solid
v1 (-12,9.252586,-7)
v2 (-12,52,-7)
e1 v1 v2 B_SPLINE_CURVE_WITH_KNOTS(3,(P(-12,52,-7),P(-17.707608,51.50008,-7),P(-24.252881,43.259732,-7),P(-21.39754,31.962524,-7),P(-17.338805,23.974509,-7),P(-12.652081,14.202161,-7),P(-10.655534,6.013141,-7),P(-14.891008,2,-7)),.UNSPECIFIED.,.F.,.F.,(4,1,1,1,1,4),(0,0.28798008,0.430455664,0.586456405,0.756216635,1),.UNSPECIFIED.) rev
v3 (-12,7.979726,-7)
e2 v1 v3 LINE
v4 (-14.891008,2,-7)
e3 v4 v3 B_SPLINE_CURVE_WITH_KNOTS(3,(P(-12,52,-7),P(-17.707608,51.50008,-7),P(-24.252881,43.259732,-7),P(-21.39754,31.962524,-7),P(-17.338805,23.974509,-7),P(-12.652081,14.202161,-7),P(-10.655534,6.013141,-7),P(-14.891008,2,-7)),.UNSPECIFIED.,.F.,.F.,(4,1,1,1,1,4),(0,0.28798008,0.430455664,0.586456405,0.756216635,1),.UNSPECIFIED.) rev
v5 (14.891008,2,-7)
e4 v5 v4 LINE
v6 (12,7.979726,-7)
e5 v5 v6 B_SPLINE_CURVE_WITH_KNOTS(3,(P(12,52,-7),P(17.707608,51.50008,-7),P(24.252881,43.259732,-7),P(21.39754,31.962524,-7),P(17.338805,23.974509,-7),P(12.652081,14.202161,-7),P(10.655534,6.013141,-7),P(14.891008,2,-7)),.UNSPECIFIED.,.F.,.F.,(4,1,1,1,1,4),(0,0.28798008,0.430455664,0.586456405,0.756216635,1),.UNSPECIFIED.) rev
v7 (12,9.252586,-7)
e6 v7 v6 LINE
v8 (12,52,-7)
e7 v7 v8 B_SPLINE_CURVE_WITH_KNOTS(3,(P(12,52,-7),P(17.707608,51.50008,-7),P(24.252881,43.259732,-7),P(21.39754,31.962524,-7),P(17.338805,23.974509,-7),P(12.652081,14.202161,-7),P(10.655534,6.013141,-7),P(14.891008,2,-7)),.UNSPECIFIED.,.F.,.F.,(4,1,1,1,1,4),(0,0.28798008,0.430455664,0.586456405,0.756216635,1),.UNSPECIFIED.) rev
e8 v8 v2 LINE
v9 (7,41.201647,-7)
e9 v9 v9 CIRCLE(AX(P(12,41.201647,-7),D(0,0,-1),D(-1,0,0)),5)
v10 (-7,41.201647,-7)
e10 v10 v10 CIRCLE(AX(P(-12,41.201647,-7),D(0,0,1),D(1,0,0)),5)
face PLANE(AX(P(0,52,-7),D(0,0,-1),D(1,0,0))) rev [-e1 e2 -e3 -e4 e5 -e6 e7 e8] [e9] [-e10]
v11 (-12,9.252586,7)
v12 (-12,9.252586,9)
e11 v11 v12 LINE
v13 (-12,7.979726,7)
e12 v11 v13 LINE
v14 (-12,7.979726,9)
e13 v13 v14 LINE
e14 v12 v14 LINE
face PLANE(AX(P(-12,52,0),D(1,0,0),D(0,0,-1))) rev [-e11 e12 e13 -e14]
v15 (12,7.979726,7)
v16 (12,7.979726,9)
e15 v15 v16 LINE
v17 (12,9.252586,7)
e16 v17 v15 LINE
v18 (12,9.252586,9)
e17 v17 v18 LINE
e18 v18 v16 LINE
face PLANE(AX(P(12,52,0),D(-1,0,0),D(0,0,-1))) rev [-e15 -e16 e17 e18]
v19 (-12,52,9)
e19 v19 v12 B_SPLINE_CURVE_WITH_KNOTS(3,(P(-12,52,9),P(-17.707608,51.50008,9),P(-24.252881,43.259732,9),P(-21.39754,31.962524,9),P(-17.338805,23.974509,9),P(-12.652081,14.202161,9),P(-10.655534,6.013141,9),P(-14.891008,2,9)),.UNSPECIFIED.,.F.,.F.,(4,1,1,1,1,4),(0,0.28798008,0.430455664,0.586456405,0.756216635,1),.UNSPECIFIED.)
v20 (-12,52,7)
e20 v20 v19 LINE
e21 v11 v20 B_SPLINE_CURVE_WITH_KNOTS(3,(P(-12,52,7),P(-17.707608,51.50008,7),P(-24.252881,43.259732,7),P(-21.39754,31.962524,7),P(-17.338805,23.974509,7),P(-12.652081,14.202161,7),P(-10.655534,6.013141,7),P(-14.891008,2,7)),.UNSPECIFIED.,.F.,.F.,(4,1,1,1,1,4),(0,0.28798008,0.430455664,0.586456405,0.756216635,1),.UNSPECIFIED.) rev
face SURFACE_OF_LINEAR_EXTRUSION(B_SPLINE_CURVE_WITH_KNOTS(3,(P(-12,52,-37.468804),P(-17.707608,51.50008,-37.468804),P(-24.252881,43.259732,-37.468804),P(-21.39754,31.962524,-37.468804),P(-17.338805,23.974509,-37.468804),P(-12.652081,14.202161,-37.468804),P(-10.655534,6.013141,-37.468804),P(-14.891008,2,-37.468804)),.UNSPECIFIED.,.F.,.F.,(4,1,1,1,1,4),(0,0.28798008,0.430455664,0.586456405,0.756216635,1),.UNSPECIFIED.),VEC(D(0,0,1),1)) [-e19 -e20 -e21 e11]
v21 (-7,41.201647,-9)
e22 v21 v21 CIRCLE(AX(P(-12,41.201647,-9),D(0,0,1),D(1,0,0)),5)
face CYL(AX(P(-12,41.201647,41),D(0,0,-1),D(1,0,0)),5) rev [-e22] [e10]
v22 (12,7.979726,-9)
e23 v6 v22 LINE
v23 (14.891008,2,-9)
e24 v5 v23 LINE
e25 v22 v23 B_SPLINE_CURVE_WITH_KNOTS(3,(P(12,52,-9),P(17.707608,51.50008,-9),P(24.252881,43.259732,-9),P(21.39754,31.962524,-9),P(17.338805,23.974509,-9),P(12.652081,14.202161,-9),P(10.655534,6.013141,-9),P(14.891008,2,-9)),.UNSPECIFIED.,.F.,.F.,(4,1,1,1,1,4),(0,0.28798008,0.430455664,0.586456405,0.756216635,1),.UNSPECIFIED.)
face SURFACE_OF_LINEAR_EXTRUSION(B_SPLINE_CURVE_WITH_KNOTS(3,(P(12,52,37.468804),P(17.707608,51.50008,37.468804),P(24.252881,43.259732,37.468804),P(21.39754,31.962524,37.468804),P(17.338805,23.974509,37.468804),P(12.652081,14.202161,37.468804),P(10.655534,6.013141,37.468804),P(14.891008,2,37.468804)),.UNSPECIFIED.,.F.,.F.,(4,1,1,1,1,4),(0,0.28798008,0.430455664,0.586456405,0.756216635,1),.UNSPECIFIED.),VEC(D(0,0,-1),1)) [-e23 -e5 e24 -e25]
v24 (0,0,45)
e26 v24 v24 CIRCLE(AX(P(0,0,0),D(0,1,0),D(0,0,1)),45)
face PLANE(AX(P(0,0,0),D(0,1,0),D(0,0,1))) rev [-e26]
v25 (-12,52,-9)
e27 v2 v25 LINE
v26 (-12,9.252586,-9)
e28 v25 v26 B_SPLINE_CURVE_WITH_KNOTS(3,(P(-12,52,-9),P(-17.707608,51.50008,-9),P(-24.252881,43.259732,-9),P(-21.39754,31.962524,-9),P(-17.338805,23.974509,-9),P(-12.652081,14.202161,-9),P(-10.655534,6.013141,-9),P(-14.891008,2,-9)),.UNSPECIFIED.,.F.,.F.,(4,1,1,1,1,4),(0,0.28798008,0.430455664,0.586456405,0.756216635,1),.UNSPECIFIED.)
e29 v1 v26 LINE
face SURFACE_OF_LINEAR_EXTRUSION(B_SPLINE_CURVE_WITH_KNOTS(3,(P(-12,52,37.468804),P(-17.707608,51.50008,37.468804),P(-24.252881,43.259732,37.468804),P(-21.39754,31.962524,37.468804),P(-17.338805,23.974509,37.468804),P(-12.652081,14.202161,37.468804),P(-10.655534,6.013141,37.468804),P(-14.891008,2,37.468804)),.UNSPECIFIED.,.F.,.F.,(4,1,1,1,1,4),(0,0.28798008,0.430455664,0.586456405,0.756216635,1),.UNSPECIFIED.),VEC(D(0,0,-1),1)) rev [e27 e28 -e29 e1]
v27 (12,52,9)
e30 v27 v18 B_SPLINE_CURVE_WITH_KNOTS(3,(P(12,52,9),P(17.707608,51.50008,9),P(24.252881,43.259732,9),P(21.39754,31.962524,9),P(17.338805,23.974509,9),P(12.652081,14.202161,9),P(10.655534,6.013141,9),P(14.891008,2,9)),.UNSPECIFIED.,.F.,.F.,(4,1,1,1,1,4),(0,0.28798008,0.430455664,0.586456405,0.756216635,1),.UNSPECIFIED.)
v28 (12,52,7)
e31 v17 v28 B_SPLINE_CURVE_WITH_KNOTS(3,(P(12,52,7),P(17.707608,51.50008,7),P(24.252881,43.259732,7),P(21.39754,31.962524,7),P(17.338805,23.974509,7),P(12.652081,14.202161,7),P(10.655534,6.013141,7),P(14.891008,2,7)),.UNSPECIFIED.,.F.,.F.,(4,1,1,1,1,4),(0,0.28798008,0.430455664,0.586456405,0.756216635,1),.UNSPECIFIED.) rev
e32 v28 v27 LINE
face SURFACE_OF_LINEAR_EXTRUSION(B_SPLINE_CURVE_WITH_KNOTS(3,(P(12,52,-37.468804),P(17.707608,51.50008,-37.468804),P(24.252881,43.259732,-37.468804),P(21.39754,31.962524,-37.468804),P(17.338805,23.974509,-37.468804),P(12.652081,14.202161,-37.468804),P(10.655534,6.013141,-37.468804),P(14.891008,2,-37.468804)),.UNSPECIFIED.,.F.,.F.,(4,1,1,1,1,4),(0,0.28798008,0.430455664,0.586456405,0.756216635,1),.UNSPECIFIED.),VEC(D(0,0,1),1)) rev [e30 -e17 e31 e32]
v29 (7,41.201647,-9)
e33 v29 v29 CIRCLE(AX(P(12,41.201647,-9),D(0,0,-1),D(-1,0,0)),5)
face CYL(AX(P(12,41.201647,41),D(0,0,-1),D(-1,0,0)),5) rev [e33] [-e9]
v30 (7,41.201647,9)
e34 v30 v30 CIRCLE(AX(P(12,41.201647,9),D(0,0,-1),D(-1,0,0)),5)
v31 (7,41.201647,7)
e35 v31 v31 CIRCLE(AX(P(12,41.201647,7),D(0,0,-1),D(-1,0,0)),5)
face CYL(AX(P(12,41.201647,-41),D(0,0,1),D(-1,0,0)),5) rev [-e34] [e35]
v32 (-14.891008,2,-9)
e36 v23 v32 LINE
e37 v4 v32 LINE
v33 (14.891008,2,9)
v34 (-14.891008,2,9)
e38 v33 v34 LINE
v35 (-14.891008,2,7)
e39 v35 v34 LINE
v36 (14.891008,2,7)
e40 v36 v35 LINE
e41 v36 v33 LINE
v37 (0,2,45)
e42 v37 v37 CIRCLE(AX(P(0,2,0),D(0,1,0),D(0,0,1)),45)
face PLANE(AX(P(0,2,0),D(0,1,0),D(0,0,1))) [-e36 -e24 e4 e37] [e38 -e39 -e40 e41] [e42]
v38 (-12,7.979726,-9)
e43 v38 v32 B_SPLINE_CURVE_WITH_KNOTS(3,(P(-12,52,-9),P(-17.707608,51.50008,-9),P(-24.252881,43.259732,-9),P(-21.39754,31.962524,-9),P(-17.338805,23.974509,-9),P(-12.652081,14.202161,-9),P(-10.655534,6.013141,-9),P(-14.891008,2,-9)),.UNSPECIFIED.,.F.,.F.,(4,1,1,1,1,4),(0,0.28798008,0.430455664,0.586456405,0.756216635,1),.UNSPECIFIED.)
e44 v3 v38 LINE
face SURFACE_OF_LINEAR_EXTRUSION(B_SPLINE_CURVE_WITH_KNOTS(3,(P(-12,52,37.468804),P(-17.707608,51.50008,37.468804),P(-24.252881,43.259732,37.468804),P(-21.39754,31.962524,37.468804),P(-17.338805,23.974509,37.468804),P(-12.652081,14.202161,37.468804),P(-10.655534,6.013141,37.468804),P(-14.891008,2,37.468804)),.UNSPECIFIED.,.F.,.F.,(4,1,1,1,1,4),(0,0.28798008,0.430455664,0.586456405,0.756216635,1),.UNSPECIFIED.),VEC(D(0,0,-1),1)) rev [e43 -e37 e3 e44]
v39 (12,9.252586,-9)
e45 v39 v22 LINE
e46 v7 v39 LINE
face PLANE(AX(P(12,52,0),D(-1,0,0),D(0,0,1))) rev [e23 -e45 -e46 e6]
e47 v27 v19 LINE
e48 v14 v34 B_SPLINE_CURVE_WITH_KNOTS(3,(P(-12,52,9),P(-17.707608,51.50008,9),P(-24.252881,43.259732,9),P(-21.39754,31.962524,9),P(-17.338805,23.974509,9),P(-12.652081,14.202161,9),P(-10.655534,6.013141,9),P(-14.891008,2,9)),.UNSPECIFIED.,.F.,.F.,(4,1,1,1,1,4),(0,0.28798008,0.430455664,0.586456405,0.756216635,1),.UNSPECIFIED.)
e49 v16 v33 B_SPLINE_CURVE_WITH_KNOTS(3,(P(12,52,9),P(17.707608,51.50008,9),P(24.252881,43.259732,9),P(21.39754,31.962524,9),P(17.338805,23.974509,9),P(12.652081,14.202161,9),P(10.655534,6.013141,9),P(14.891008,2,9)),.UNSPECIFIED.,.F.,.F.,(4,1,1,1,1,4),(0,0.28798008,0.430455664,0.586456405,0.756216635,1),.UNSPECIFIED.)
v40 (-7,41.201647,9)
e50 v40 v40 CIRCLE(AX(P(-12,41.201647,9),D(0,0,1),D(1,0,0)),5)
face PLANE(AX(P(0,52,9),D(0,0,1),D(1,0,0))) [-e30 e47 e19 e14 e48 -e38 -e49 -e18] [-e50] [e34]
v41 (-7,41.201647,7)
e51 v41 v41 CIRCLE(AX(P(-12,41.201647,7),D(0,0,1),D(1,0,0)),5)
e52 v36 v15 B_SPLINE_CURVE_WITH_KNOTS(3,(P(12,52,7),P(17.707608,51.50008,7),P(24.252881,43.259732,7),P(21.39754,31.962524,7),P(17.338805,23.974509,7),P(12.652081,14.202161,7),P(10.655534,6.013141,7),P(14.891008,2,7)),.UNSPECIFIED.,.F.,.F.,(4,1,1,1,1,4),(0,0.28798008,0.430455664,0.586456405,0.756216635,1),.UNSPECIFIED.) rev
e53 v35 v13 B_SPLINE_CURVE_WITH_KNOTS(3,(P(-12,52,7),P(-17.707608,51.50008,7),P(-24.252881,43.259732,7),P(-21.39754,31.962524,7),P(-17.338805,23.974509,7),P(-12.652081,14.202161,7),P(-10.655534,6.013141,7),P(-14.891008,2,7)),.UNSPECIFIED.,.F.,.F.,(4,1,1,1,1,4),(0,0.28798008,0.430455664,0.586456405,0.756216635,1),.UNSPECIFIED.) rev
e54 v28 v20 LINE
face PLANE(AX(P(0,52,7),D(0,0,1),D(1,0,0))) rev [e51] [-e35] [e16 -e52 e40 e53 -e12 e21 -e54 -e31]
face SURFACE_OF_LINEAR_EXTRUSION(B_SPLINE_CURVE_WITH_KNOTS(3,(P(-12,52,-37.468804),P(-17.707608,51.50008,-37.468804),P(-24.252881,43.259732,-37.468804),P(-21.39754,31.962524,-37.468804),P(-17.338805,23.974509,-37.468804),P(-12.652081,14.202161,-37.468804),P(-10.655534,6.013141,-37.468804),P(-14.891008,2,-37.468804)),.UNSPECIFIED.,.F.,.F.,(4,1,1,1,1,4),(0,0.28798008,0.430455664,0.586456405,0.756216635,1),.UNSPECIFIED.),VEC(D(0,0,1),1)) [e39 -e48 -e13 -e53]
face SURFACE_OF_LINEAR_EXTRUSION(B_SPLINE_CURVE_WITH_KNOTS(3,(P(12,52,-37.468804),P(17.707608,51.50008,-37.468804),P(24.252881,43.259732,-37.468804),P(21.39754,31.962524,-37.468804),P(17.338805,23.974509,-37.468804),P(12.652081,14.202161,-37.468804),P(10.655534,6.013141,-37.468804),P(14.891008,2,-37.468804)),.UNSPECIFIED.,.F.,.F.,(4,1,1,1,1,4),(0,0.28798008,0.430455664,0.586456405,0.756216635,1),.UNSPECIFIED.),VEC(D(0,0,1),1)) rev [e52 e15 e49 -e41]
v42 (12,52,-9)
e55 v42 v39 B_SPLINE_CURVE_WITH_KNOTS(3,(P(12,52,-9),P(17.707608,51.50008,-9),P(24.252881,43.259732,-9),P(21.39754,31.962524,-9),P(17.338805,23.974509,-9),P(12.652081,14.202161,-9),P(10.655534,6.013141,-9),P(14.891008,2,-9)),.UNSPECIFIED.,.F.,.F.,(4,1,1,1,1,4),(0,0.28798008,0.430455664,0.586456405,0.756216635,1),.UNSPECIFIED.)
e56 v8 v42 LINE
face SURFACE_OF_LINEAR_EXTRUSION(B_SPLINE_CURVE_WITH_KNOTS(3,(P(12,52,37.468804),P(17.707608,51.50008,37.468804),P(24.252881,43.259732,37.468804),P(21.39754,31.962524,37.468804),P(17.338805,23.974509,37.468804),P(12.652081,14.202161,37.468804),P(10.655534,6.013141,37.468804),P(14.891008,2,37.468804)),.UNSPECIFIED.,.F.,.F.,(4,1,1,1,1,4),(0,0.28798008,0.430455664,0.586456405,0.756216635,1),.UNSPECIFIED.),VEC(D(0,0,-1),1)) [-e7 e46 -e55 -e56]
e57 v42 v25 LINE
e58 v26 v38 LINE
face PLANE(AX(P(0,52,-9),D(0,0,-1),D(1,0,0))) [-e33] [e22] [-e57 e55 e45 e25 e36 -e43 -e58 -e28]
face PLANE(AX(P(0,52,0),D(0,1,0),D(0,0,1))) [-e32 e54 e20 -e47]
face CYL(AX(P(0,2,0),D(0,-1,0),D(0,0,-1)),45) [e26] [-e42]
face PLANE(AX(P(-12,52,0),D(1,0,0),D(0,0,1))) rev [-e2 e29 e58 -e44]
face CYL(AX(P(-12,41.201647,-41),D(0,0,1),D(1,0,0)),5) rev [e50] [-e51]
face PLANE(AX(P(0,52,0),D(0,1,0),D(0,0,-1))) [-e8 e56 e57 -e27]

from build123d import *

# Parameters (mm, degrees)
SKETCH1_R           = 45
BOSS_EXTRUDE1_DEPTH = 2
SKETCH2_W           = 12
SKETCH2_H           = 2
BOSS_EXTRUDE2_DEPTH = 50
BOSS_EXTRUDE3_START = -2
BOSS_EXTRUDE3_DEPTH = 2
SKETCH4_R           = 5
CUT_EXTRUDE1_DEPTH  = 50


# Read off the part's stored shape, not the designer's step: Boss-Extrude3
with BuildPart() as part:
    # Sketch1 → Boss-Extrude1 (new body)
    with BuildSketch(Plane(origin=(0, 0, 0), x_dir=(1, 0, 0), z_dir=(0, 1, 0))):
        with Locations(Location((0, 0, 0), (0, 0, 270))):
            Circle(SKETCH1_R)
    extrude(amount=BOSS_EXTRUDE1_DEPTH)

    # Sketch2 → Boss-Extrude2 (add)
    with BuildSketch(Plane(origin=(0, 2, 0), x_dir=(1, 0, 0), z_dir=(0, 1, 0))):
        with Locations((-6, -8)):
            Rectangle(SKETCH2_W, SKETCH2_H)
    extrude(amount=BOSS_EXTRUDE2_DEPTH)

    # Boss-Extrude3 outline → Boss-Extrude3 (add)
    with BuildSketch(Plane.XY.offset(9).offset(BOSS_EXTRUDE3_START)):
        with BuildLine():
            Line((-12, 9.252585755), (-12, 52))
            add(Edge.make_bspline(
                [(-12, 52), (-17.707608273, 51.500079533), (-24.252880777, 43.259732346), (-21.397540076, 31.962524142), (-17.33880503, 23.974508646), (-13.768744124, 16.530528707), (-12.117269051, 11.269699014), (-12, 9.252585755)],
                knots=[0, 0, 0, 0, 0.28798008, 0.430455664, 0.586456405, 0.756216635, 0.864299894, 0.864299894, 0.864299894, 0.864299894], degree=3))
        make_face()
        with BuildLine():
            Line((-12, 2), (-12, 7.979725632))
            add(Edge.make_bspline(
                [(-12, 7.979725632), (-12.129131204, 5.890942784), (-12.929877772, 3.858184366), (-14.891007751, 2)],
                knots=[0.887122224, 0.887122224, 0.887122224, 0.887122224, 1, 1, 1, 1], degree=3))
            Line((-14.891007751, 2), (-12, 2))
        make_face()
    extrude(amount=BOSS_EXTRUDE3_DEPTH)

    # Sketch4 → Cut-Extrude1 (cut)
    with BuildSketch(Plane.XY.offset(9)):
        with Locations((-12, 41.201646807)):
            Circle(SKETCH4_R)
    extrude(amount=-CUT_EXTRUDE1_DEPTH, mode=Mode.SUBTRACT)

    # Mirror1: part across plane


with BuildPart() as part_1:
    add(part.part)
    add(part.part.mirror(Plane(origin=(0, 52, 0), x_dir=(0, 0, 1), z_dir=(1, 0, 0))))

    # Mirror2: part across plane


with BuildPart() as part_2:
    add(part_1.part)
    add(part_1.part.mirror(Plane.XY))


solid = part_2.part
